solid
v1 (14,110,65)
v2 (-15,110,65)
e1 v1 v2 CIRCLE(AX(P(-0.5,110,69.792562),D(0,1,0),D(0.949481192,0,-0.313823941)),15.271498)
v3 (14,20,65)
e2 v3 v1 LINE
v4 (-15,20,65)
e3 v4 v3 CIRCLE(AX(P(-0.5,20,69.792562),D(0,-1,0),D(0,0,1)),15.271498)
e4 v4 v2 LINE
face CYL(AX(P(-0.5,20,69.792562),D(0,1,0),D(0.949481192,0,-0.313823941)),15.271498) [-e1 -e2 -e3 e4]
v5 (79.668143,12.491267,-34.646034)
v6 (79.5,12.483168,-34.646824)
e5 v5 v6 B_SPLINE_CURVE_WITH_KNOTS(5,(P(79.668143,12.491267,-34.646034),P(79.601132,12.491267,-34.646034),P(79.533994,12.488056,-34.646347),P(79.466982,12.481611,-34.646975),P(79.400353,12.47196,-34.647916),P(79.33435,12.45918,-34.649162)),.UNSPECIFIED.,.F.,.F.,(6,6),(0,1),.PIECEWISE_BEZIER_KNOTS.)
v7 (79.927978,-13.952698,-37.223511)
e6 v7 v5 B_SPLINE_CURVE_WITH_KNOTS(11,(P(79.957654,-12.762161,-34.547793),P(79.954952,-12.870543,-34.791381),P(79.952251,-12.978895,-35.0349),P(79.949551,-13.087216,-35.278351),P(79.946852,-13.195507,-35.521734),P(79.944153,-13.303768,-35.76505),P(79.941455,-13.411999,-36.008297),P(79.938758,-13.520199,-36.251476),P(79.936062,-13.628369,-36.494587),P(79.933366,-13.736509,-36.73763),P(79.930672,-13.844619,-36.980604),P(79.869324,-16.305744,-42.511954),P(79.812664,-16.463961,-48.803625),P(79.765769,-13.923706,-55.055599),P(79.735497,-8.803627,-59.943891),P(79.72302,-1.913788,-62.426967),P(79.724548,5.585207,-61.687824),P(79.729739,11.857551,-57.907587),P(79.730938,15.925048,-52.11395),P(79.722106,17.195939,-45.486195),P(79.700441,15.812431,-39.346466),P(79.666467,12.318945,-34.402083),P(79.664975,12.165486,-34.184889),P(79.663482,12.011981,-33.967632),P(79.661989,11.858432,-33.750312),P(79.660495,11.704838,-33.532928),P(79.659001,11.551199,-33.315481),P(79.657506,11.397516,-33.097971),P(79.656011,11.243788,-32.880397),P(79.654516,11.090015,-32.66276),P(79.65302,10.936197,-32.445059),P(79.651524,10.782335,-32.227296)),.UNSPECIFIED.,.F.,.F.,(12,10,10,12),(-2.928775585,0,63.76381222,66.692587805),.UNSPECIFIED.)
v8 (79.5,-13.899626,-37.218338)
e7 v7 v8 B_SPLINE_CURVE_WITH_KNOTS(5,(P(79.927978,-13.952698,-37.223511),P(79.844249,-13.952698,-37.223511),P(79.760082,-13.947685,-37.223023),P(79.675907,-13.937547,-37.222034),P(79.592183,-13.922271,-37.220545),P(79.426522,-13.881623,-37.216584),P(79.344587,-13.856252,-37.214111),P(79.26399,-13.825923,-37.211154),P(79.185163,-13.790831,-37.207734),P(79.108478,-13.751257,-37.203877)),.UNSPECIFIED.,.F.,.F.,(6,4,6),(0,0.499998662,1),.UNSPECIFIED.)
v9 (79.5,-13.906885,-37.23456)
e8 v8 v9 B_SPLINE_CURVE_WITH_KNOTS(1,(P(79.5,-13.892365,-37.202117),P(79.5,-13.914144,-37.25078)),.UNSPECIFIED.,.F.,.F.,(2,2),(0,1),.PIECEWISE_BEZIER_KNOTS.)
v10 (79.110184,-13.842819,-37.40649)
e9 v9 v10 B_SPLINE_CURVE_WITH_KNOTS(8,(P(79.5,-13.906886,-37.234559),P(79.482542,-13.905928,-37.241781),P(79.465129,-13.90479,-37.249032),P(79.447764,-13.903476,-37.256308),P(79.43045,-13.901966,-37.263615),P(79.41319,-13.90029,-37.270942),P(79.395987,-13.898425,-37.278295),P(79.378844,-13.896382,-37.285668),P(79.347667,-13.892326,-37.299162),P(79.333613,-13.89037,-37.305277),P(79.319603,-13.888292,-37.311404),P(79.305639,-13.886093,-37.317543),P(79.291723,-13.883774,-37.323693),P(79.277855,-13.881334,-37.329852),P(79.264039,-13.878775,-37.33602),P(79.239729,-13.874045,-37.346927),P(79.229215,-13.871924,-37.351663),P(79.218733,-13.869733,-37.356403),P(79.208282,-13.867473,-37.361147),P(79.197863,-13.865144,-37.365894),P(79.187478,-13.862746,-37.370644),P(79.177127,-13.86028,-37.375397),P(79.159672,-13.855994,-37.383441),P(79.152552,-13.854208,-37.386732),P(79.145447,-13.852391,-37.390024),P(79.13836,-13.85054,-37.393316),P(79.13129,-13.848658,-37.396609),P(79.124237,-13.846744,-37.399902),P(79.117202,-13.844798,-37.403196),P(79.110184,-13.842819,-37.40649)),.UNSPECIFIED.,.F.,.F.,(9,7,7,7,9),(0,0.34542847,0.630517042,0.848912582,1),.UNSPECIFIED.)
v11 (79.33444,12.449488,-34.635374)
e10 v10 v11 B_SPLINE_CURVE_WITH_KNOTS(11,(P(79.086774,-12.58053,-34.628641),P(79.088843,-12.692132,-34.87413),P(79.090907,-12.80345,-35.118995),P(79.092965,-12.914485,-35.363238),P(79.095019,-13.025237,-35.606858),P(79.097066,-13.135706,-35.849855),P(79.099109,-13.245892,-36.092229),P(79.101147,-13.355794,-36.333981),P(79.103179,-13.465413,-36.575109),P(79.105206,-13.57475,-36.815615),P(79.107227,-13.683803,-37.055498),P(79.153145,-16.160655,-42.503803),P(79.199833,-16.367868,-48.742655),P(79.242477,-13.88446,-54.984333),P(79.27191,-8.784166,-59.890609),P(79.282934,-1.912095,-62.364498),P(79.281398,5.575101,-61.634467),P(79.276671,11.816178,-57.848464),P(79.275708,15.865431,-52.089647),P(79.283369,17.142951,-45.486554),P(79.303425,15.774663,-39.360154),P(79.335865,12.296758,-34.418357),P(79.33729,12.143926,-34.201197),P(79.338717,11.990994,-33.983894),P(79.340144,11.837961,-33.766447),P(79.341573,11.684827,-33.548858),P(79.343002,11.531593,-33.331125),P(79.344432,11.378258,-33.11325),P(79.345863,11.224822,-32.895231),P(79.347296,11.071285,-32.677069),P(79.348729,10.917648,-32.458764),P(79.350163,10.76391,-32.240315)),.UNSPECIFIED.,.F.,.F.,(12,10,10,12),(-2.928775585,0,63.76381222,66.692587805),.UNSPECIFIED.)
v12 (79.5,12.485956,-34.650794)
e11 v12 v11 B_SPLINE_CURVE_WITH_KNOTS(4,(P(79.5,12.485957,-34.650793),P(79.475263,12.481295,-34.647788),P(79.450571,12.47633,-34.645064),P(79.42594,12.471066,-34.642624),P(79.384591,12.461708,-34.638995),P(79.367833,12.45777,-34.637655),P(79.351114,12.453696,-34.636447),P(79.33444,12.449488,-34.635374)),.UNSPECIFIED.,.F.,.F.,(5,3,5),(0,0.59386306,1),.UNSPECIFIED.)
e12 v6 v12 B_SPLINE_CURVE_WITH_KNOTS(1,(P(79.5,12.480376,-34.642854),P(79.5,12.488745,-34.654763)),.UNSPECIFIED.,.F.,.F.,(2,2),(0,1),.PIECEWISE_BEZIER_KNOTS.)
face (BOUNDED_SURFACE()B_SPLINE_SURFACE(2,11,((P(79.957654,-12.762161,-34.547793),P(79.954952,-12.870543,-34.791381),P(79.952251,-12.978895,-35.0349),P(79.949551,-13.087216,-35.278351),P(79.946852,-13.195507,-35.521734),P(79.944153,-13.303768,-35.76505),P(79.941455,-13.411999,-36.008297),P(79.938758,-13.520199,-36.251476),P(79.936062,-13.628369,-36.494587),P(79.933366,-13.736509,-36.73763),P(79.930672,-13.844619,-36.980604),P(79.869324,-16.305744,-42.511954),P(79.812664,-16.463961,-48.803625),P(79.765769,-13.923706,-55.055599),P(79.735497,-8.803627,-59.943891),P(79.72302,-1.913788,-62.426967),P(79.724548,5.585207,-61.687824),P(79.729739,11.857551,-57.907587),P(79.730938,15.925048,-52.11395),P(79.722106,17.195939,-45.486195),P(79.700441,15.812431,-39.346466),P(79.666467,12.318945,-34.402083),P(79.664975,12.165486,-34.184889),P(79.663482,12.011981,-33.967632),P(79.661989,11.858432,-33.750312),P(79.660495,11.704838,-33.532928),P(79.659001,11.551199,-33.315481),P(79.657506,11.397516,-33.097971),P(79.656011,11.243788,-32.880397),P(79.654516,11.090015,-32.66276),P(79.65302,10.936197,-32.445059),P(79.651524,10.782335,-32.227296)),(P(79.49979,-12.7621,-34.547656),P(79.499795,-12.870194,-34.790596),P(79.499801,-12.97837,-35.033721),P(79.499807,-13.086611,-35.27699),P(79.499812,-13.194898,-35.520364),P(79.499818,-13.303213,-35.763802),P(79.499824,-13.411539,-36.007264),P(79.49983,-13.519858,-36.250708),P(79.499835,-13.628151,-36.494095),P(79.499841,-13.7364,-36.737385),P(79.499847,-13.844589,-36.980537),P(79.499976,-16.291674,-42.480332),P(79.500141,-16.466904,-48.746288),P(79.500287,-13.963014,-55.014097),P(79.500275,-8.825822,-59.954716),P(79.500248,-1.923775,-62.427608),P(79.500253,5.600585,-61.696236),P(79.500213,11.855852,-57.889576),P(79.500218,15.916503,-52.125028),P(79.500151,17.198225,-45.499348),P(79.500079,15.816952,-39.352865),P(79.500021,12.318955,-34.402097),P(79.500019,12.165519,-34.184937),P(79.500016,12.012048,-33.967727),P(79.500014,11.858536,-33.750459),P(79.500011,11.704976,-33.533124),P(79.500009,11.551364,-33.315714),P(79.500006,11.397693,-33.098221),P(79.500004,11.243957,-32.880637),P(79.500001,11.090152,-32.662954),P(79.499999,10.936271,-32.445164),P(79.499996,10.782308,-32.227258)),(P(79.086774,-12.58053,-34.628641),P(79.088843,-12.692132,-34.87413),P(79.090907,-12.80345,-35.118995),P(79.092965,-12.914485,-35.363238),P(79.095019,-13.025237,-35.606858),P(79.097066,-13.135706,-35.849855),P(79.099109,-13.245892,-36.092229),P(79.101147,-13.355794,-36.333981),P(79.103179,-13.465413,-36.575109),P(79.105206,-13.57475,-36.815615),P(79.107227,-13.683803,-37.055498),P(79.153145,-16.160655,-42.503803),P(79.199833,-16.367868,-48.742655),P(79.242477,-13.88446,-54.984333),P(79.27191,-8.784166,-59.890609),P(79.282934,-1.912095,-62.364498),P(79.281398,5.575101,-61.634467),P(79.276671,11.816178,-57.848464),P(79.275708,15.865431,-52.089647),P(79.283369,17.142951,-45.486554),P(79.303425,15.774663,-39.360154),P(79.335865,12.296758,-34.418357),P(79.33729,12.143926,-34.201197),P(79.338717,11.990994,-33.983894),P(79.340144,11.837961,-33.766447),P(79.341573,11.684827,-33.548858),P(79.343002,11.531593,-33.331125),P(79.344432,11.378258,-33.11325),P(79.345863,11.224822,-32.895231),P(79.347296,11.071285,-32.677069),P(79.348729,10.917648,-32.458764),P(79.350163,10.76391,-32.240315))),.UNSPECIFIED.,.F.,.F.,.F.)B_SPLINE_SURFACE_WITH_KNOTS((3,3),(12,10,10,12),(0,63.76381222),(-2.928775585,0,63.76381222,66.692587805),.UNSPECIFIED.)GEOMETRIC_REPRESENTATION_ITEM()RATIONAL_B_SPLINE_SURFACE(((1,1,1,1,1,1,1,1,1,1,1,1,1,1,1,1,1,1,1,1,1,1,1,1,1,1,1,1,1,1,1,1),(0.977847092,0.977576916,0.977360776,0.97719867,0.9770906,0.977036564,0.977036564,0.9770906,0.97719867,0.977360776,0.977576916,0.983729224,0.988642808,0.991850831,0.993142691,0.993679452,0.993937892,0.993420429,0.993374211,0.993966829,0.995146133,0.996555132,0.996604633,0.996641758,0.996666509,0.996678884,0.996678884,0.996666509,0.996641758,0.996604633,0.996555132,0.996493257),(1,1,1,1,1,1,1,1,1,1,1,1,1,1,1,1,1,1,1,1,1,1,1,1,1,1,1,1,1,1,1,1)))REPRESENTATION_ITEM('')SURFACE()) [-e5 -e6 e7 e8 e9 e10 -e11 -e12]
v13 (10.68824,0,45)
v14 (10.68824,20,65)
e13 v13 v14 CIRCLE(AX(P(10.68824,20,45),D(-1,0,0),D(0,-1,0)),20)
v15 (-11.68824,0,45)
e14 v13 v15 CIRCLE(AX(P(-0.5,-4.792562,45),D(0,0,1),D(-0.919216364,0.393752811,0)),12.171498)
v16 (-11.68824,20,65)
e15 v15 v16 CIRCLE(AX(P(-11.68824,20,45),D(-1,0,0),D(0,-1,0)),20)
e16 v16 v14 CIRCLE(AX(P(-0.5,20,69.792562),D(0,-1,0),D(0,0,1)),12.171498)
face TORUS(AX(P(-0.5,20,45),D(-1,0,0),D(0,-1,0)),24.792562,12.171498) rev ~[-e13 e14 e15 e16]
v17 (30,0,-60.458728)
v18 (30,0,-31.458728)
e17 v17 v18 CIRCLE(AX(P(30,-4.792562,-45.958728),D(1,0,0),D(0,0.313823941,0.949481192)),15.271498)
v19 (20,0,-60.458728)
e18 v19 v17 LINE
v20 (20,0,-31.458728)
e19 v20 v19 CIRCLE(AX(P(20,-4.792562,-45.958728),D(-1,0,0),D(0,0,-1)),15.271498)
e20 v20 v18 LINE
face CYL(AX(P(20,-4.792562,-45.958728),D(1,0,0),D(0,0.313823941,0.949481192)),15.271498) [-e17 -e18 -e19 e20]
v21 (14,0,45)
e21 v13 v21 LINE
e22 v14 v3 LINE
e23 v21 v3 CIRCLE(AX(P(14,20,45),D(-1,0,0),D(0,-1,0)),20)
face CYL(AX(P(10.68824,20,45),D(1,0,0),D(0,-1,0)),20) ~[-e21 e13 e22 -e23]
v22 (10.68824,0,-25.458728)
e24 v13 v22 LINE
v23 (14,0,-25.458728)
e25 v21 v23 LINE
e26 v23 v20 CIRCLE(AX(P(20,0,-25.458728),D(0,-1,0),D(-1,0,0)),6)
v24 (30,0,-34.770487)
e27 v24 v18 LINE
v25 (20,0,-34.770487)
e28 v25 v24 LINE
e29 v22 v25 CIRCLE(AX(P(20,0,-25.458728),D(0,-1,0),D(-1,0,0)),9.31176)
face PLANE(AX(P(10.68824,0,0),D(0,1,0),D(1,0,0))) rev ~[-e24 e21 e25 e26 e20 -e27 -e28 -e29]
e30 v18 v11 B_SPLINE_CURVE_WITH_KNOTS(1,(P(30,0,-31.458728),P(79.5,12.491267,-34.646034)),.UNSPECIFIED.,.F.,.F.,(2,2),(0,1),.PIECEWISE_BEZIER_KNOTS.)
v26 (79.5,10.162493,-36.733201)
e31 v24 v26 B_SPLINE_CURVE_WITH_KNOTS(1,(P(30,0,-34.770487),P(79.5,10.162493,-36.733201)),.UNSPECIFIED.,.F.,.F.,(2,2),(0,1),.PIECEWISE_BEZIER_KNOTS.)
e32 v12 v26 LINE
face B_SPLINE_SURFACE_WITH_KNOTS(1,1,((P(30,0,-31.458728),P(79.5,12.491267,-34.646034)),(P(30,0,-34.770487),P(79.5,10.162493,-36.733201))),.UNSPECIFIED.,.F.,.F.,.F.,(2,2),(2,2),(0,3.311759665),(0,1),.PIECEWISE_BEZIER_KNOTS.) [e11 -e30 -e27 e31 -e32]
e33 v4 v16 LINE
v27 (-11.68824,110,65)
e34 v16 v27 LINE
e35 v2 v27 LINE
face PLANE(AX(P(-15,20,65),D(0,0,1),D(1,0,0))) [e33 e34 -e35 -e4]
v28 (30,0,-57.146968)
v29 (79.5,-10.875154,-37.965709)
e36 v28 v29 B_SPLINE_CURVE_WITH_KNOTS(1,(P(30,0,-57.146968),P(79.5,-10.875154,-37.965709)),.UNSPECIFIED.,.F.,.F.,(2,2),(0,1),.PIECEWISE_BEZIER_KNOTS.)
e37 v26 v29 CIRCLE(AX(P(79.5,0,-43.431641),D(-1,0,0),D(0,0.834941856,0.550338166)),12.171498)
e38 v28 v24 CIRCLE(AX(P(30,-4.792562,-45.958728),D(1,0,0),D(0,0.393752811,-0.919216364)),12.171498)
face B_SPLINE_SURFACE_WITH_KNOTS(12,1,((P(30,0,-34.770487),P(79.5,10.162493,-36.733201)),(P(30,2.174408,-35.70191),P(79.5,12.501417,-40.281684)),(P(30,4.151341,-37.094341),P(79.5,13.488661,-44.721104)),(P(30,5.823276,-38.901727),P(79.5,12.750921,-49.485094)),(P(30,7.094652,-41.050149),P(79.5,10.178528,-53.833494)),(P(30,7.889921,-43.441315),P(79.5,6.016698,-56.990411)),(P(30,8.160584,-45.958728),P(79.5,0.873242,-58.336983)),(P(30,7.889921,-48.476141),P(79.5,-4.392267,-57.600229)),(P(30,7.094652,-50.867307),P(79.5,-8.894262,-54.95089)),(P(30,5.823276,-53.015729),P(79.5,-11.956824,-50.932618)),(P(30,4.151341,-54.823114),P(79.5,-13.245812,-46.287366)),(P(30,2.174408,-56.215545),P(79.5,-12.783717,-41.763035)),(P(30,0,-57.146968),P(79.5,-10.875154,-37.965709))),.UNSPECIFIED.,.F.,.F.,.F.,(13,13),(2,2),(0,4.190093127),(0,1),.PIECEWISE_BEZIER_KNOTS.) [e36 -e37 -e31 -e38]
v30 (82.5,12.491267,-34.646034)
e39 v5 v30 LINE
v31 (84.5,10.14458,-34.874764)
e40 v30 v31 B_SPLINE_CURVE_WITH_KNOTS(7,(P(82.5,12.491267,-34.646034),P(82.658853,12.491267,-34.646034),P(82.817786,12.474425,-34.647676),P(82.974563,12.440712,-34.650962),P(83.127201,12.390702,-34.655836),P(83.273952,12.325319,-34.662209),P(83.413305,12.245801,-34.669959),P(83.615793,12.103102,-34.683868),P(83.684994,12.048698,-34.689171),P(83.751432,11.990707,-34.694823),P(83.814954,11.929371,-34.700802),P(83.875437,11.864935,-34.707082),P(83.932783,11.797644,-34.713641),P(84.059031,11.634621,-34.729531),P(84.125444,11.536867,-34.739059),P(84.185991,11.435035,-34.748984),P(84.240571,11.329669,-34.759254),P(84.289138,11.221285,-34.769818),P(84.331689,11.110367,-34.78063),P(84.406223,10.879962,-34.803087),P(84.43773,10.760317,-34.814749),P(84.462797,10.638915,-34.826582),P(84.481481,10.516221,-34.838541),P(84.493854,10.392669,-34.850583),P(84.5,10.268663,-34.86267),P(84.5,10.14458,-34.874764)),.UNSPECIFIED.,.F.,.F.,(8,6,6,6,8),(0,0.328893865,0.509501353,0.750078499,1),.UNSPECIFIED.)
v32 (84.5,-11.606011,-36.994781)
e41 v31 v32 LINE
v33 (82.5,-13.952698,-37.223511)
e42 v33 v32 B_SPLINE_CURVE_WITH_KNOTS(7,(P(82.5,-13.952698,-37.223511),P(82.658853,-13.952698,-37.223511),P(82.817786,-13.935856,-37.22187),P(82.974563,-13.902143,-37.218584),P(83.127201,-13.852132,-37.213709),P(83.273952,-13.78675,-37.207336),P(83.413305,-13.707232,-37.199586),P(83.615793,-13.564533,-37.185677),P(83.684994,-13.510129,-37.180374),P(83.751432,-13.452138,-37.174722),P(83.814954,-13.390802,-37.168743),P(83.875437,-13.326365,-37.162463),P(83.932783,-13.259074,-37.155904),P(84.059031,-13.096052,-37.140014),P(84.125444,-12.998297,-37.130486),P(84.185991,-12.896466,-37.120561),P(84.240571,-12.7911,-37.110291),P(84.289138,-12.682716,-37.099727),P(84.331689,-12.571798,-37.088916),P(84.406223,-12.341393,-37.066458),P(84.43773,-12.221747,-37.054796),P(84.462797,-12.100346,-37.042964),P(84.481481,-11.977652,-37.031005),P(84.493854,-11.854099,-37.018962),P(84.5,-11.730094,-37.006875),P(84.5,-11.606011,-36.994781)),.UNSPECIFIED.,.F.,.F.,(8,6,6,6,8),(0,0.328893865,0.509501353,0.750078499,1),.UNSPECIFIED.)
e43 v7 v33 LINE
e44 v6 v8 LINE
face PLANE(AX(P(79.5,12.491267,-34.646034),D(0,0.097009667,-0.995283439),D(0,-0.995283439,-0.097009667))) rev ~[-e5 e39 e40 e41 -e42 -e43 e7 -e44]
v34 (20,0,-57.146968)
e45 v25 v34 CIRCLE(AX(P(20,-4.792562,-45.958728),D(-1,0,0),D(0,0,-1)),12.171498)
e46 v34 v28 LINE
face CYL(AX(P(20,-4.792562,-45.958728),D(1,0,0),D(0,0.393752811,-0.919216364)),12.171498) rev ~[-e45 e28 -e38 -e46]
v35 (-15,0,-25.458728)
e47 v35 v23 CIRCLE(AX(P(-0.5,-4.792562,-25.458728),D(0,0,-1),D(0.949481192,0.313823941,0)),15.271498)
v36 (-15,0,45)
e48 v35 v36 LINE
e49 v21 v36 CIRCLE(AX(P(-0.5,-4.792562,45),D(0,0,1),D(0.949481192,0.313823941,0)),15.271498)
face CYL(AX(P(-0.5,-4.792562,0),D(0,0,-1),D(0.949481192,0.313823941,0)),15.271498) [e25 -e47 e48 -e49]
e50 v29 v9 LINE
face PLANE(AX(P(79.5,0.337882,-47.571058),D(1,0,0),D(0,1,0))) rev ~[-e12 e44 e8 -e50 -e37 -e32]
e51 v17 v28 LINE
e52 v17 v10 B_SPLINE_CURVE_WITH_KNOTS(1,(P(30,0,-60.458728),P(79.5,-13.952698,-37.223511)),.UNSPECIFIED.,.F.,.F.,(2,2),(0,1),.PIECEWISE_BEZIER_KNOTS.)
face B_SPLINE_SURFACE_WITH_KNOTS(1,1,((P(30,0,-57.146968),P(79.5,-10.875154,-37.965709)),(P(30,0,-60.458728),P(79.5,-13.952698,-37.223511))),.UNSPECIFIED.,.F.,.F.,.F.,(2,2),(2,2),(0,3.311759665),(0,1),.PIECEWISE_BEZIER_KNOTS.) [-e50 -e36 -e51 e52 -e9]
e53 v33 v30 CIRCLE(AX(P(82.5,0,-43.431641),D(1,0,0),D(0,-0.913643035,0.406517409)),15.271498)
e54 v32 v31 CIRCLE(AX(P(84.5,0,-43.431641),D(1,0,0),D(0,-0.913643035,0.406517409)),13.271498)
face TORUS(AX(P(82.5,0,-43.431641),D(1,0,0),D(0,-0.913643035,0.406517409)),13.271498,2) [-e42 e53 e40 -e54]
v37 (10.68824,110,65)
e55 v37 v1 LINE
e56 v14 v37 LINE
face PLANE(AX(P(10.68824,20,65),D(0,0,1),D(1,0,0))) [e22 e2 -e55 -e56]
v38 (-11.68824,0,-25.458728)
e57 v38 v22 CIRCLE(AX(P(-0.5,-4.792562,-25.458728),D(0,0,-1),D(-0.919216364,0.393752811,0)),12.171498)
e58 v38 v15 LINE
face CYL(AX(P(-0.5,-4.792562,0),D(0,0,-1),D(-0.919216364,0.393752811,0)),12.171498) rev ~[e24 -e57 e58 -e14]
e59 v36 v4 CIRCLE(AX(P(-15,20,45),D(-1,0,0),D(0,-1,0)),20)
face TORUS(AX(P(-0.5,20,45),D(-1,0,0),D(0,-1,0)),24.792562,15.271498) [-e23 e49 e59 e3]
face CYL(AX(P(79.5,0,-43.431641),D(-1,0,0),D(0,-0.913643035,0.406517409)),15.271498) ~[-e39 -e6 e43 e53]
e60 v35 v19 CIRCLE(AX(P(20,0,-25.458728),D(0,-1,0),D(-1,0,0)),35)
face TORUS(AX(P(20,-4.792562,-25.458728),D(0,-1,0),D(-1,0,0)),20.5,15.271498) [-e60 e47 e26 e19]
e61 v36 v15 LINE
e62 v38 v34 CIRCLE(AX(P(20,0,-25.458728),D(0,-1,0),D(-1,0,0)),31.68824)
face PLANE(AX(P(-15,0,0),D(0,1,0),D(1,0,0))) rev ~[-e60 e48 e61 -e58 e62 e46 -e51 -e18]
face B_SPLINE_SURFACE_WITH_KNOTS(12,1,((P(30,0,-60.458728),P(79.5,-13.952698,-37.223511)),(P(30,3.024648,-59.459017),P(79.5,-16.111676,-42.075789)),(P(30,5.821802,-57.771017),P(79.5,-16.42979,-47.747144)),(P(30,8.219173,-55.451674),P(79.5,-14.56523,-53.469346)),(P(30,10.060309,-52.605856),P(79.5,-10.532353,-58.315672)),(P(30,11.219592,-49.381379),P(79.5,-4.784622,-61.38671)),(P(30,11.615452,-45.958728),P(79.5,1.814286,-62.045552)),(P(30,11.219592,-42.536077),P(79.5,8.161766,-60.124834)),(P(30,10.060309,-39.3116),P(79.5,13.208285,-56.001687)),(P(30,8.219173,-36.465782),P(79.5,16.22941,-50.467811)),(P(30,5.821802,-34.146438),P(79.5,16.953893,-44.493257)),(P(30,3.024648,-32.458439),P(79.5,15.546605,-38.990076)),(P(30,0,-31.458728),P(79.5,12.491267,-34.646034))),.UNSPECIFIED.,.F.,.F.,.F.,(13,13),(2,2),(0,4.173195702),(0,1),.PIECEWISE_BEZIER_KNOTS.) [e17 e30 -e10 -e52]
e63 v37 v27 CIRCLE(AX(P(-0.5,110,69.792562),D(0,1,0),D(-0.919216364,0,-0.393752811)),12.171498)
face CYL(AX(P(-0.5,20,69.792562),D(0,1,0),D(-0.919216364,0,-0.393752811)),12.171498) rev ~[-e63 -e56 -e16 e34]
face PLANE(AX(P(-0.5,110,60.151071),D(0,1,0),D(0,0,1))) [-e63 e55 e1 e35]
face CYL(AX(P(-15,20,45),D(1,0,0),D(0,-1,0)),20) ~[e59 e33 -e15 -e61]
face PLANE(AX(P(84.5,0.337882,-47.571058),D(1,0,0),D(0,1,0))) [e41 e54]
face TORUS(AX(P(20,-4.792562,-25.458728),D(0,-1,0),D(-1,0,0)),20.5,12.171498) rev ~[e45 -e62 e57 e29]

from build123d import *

# Parameters (mm, degrees)
F9_DEPTH = 5
F10_R    = 2


with BuildPart() as f2:
    # F2: sweep along a path in F1
    with BuildLine(Plane.YZ) as f2_path:
        Line((0, 0), (0, 45))
        ThreePointArc((0, 45), (5.8578643763, 59.1421356237), (20, 65))
        Line((20, 65), (110, 65))
    # F0 (on Top) → F2 (sweep)
    with BuildSketch(Plane.XY):
        with BuildLine():
            ThreePointArc((14, 0), (-0.5, 10.478936224), (-15, 0))
            Line((-15, 0), (-11.6882403352, 0))
            ThreePointArc((-11.6882403352, 0), (-0.5, 7.3789365762), (10.6882403352, 0))
            Line((10.6882403352, 0), (14, 0))
        make_face()
    sweep(path=f2_path.line)

    # F6: sweep along a path in F4
    with BuildLine(Plane.XZ) as f6_path:
        Line((0, 0), (0, -25.4587277886))
        ThreePointArc((0, -25.4587277886), (5.8578643763, -39.6008634124), (20, -45.4587277886))
        Line((20, -45.4587277886), (30, -45.4587277886))
    # F0 (on Top) → F6 (sweep)
    with BuildSketch(Plane.XY):
        with BuildLine():
            ThreePointArc((14, 0), (-0.5, 10.478936224), (-15, 0))
            Line((-15, 0), (-11.6882403352, 0))
            ThreePointArc((-11.6882403352, 0), (-0.5, 7.3789365762), (10.6882403352, 0))
            Line((10.6882403352, 0), (14, 0))
        make_face()
    sweep(path=f6_path.line)

    # F6_face (on face) → F7 section 0
    with BuildSketch(Plane(origin=(30, 5.8470332672, -45.9587277886), x_dir=(0, 1, 0), z_dir=(1, 0, 0))):
        with BuildLine():
            Line((-5.8470332672, -11.1882403352), (-5.8470332672, -14.5))
            ThreePointArc((-5.8470332672, -14.5), (4.6319029568, 0), (-5.8470332672, 14.5))
            Line((-5.8470332672, 14.5), (-5.8470332672, 11.1882403352))
            ThreePointArc((-5.8470332672, 11.1882403352), (1.5319033089, 0), (-5.8470332672, -11.1882403352))
        make_face()
    # F5 (on offset) → F7 section 1
    with BuildSketch(Plane.YZ.offset(79.5)):
        with BuildLine():
            Line((-10.8751536487, -37.9657093932), (-13.9526978979, -37.2235111379))
            ThreePointArc((-13.9526978979, -37.2235111379), (1.4814826902, -58.6311098034), (12.4912671201, -34.6460340717))
            Line((12.4912671201, -34.6460340717), (10.1624930815, -36.7332008739))
            ThreePointArc((10.1624930815, -36.7332008739), (0.7118567894, -55.5823045887), (-10.8751536487, -37.9657093932))
        make_face()
    loft()

    # F5 (on offset) + F8 (on face) → F9 (join)
    with BuildSketch(Plane.YZ.offset(79.5)):
        with BuildLine():
            Line((-10.8751536487, -37.9657093932), (-13.9526978979, -37.2235111379))
            ThreePointArc((-13.9526978979, -37.2235111379), (1.4814826902, -58.6311098034), (12.4912671201, -34.6460340717))
            Line((12.4912671201, -34.6460340717), (10.1624930815, -36.7332008739))
            ThreePointArc((10.1624930815, -36.7332008739), (0.7118567894, -55.5823045887), (-10.8751536487, -37.9657093932))
        make_face()
    with BuildSketch(Plane.YZ.offset(79.5)):
        with BuildLine():
            Line((12.4912671201, -34.6460340717), (10.1624930815, -36.7332008739))
            ThreePointArc((10.1624930815, -36.7332008739), (0.7118567894, -55.5823045887), (-10.8751536487, -37.9657093932))
            Line((-10.8751536487, -37.9657093932), (-13.9526978979, -37.2235111379))
            ThreePointArc((-13.9526978979, -37.2235111379), (1.4814826902, -58.6311098034), (12.4912671201, -34.6460340717))
        make_face()
        with BuildLine():
            ThreePointArc((-10.8751536487, -37.9657093932), (0.7118567894, -55.5823045887), (10.1624930815, -36.7332008739))
            Line((10.1624930815, -36.7332008739), (12.4912671201, -34.6460340717))
            Line((12.4912671201, -34.6460340717), (-13.9526978979, -37.2235111379))
            Line((-13.9526978979, -37.2235111379), (-10.8751536487, -37.9657093932))
        make_face()
    extrude(amount=F9_DEPTH)

    # F10
    f10_edges = [f2.edges().sort_by_distance(p)[0] for p in [
        (84.5, 1.481483, -58.63111),
        (79.5, 1.481483, -58.63111),
    ]]
    fillet(f10_edges, radius=F10_R)


solid = f2.part
